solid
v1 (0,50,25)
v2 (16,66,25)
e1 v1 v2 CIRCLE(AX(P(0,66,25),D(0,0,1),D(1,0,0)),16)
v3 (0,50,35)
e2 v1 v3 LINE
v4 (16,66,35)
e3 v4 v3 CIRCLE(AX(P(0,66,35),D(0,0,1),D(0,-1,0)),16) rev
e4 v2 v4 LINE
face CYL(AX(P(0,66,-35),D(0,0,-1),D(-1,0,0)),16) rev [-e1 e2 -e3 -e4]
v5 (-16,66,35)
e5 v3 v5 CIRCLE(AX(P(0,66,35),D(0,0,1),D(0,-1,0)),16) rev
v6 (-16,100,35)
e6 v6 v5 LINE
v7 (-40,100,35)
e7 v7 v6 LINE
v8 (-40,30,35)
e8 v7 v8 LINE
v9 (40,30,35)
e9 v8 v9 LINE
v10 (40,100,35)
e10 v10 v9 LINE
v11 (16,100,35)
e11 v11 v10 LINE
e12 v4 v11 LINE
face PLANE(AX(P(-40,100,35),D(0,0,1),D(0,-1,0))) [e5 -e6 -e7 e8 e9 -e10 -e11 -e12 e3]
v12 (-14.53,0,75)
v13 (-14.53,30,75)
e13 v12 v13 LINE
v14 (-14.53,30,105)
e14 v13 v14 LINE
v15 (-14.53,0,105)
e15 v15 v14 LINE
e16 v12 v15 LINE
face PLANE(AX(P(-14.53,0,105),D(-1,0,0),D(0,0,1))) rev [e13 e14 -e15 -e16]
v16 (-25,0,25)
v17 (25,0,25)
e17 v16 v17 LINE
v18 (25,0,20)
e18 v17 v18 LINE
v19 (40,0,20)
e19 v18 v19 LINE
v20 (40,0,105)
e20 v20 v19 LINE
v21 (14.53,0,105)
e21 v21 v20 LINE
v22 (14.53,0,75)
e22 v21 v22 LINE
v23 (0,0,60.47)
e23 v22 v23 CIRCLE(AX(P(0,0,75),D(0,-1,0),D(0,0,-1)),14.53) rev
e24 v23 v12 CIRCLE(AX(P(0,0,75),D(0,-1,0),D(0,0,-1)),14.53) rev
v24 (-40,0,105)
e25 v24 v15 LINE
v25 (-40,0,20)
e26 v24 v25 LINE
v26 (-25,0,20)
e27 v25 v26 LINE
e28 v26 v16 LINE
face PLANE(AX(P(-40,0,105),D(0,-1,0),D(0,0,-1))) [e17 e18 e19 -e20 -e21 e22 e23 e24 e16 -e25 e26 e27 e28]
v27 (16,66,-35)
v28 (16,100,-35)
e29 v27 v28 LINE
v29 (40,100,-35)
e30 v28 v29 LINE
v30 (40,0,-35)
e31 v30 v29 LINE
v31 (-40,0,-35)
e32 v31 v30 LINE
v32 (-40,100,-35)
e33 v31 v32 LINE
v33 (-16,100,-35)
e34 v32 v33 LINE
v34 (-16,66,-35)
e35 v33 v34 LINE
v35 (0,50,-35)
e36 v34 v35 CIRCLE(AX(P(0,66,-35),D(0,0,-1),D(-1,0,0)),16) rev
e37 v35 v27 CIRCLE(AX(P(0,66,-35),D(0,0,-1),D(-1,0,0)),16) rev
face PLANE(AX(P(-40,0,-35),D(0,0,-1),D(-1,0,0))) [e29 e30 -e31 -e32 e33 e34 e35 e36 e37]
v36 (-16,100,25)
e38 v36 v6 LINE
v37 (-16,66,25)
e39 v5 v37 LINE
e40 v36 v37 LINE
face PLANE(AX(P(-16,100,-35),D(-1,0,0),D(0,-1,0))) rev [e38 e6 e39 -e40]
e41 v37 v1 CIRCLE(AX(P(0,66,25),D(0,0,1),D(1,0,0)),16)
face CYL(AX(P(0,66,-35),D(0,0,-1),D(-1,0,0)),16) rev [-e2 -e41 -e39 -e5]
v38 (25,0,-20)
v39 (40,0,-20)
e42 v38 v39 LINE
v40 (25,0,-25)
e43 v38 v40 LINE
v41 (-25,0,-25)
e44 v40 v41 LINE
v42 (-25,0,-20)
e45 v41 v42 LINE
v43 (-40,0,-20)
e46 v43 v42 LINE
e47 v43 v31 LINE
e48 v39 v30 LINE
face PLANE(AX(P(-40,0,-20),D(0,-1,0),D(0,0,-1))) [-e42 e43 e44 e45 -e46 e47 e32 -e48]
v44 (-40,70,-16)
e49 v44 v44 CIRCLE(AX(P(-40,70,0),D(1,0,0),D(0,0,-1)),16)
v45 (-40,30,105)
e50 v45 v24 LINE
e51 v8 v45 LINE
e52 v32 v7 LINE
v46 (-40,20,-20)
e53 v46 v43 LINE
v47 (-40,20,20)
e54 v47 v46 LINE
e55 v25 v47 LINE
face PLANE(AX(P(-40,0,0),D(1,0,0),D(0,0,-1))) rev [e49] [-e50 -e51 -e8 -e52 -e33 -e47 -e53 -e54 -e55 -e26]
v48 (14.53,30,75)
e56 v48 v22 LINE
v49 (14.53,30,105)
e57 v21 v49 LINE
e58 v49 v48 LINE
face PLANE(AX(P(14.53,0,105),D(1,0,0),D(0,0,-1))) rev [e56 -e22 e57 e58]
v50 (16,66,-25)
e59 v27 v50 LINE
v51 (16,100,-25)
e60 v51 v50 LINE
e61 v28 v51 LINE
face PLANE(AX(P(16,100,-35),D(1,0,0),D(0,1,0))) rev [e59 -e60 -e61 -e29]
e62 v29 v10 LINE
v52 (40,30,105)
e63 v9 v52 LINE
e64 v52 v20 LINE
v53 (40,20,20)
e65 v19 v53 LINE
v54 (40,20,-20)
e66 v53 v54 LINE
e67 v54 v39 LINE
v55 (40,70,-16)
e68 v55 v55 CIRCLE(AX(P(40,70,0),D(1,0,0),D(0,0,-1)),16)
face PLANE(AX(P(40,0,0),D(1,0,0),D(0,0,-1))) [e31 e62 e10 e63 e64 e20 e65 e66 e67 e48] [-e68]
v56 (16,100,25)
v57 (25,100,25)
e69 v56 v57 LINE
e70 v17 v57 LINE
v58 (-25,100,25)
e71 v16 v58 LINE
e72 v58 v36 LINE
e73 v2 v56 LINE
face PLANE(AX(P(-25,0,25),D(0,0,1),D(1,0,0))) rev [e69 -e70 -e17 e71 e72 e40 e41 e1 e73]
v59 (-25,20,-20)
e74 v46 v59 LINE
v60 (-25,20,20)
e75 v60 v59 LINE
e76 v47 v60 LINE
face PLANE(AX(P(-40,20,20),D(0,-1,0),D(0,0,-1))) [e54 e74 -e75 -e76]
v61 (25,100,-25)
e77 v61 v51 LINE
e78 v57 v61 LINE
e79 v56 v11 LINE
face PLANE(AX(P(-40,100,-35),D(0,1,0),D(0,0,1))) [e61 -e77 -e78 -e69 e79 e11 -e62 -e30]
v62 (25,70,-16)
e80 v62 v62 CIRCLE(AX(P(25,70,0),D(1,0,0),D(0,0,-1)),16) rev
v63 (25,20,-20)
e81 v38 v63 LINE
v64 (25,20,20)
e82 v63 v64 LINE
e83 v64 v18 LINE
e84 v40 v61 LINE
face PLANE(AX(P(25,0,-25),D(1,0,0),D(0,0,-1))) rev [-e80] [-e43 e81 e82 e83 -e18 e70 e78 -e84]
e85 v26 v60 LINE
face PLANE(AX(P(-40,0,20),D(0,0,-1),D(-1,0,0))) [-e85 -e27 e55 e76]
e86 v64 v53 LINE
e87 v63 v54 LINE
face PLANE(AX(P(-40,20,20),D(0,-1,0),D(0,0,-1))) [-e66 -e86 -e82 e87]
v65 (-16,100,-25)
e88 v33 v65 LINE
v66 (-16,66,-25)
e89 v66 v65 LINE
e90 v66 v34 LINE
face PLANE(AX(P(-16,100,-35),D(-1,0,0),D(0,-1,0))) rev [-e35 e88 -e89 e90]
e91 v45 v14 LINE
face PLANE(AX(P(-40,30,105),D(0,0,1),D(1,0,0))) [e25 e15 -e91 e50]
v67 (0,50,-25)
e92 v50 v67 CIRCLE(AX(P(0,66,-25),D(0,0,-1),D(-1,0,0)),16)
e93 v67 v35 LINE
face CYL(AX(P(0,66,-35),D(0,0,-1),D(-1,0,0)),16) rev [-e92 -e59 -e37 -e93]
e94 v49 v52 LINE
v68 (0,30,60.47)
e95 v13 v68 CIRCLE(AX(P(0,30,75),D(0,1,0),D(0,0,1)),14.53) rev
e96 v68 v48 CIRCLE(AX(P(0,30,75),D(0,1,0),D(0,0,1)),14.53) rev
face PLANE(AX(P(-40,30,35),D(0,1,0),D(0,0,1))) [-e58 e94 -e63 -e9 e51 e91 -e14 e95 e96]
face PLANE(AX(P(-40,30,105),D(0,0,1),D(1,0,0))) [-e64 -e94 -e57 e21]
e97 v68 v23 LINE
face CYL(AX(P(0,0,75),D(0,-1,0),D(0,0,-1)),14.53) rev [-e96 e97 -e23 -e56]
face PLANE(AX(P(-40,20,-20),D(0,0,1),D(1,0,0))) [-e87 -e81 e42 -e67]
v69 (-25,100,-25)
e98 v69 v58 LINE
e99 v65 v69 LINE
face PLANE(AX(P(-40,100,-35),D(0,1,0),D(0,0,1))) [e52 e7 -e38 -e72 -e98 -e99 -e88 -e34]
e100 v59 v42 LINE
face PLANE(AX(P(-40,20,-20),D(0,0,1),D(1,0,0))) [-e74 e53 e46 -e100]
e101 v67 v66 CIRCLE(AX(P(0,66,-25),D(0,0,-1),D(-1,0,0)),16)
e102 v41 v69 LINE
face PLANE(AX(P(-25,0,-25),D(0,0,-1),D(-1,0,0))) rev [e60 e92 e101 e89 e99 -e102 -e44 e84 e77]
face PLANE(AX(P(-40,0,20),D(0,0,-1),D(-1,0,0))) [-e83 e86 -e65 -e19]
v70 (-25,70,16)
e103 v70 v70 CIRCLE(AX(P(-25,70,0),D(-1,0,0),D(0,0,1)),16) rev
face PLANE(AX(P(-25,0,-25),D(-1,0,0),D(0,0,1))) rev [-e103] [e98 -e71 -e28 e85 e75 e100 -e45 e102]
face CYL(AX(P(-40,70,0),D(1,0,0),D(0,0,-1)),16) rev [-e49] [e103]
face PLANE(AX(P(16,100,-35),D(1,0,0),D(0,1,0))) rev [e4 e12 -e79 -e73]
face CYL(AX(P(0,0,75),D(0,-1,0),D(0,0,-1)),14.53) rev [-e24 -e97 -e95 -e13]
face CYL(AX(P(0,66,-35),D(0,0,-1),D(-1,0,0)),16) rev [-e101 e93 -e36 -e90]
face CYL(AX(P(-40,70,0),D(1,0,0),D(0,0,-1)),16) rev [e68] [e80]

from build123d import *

# Parameters (mm, degrees)
BOSS_EXTRUDE1_DEPTH      = 40
BOSS_EXTRUDE1_DEPTH_BACK = 40
SKETCH1_R                = 16
SKETCH2_W                = 50
SKETCH2_H                = 50
CUT_EXTRUDE1_DEPTH       = 151.416089565
SKETCH3_W                = 32
SKETCH3_H                = 50
CUT_EXTRUDE2_DEPTH       = 129.452325787
FILLET1_R                = 16
SKETCH4_W                = 29.06
SKETCH4_H                = 44.53
CUT_EXTRUDE3_DEPTH       = 133.382022949
FILLET2_R                = 14.53


with BuildPart() as part:
    # Sketch1 → Boss-Extrude1 (new, two sides: drawn at the far end of the back side and taken through both)
    with BuildSketch(Plane(origin=(0, 0, 0), x_dir=(0, 0, -1), z_dir=(1, 0, 0)).offset(-BOSS_EXTRUDE1_DEPTH_BACK)):
        Polygon((-105, 0), (-20, 0), (-20, 20), (20, 20), (20, 0), (35, 0), (35, 100), (-35, 100), (-35, 30), (-105, 30), align=None)
        with Locations((0, 70)):
            Circle(SKETCH1_R, mode=Mode.SUBTRACT)
    extrude(amount=BOSS_EXTRUDE1_DEPTH + BOSS_EXTRUDE1_DEPTH_BACK)

    # Sketch2 → Cut-Extrude1 (cut, through all)
    with BuildSketch(Plane(origin=(0, 100, 0), x_dir=(1, 0, 0), z_dir=(0, 1, 0))):
        Rectangle(SKETCH2_W, SKETCH2_H)
    extrude(amount=-CUT_EXTRUDE1_DEPTH, mode=Mode.SUBTRACT)

    # Sketch3 → Cut-Extrude2 (cut, through all)
    with BuildSketch(Plane.XY.offset(35)):
        with Locations((0, 75)):
            Rectangle(SKETCH3_W, SKETCH3_H)
    extrude(amount=-CUT_EXTRUDE2_DEPTH, mode=Mode.SUBTRACT)

    # Fillet1
    fillet1_edges = [part.edges().sort_by_distance(p)[0] for p in [
        (-16, 50, -30),
        (16, 50, -30),
        (16, 50, 30),
        (-16, 50, 30),
    ]]
    fillet(fillet1_edges, radius=FILLET1_R - 0.0001)  # a hair under: the kernel refuses the full size

    # Sketch4 → Cut-Extrude3 (cut, through all)
    with BuildSketch(Plane(origin=(0, 30, 0), x_dir=(1, 0, 0), z_dir=(0, 1, 0))):
        with Locations((0, -82.735)):
            Rectangle(SKETCH4_W, SKETCH4_H)
    extrude(amount=-CUT_EXTRUDE3_DEPTH, mode=Mode.SUBTRACT)

    # Fillet2
    fillet2_edges = [part.edges().sort_by_distance(p)[0] for p in [
        (14.53, 15, 60.47),
        (-14.53, 15, 60.47),
    ]]
    fillet(fillet2_edges, radius=FILLET2_R - 0.0001)  # a hair under: the kernel refuses the full size


solid = part.part
